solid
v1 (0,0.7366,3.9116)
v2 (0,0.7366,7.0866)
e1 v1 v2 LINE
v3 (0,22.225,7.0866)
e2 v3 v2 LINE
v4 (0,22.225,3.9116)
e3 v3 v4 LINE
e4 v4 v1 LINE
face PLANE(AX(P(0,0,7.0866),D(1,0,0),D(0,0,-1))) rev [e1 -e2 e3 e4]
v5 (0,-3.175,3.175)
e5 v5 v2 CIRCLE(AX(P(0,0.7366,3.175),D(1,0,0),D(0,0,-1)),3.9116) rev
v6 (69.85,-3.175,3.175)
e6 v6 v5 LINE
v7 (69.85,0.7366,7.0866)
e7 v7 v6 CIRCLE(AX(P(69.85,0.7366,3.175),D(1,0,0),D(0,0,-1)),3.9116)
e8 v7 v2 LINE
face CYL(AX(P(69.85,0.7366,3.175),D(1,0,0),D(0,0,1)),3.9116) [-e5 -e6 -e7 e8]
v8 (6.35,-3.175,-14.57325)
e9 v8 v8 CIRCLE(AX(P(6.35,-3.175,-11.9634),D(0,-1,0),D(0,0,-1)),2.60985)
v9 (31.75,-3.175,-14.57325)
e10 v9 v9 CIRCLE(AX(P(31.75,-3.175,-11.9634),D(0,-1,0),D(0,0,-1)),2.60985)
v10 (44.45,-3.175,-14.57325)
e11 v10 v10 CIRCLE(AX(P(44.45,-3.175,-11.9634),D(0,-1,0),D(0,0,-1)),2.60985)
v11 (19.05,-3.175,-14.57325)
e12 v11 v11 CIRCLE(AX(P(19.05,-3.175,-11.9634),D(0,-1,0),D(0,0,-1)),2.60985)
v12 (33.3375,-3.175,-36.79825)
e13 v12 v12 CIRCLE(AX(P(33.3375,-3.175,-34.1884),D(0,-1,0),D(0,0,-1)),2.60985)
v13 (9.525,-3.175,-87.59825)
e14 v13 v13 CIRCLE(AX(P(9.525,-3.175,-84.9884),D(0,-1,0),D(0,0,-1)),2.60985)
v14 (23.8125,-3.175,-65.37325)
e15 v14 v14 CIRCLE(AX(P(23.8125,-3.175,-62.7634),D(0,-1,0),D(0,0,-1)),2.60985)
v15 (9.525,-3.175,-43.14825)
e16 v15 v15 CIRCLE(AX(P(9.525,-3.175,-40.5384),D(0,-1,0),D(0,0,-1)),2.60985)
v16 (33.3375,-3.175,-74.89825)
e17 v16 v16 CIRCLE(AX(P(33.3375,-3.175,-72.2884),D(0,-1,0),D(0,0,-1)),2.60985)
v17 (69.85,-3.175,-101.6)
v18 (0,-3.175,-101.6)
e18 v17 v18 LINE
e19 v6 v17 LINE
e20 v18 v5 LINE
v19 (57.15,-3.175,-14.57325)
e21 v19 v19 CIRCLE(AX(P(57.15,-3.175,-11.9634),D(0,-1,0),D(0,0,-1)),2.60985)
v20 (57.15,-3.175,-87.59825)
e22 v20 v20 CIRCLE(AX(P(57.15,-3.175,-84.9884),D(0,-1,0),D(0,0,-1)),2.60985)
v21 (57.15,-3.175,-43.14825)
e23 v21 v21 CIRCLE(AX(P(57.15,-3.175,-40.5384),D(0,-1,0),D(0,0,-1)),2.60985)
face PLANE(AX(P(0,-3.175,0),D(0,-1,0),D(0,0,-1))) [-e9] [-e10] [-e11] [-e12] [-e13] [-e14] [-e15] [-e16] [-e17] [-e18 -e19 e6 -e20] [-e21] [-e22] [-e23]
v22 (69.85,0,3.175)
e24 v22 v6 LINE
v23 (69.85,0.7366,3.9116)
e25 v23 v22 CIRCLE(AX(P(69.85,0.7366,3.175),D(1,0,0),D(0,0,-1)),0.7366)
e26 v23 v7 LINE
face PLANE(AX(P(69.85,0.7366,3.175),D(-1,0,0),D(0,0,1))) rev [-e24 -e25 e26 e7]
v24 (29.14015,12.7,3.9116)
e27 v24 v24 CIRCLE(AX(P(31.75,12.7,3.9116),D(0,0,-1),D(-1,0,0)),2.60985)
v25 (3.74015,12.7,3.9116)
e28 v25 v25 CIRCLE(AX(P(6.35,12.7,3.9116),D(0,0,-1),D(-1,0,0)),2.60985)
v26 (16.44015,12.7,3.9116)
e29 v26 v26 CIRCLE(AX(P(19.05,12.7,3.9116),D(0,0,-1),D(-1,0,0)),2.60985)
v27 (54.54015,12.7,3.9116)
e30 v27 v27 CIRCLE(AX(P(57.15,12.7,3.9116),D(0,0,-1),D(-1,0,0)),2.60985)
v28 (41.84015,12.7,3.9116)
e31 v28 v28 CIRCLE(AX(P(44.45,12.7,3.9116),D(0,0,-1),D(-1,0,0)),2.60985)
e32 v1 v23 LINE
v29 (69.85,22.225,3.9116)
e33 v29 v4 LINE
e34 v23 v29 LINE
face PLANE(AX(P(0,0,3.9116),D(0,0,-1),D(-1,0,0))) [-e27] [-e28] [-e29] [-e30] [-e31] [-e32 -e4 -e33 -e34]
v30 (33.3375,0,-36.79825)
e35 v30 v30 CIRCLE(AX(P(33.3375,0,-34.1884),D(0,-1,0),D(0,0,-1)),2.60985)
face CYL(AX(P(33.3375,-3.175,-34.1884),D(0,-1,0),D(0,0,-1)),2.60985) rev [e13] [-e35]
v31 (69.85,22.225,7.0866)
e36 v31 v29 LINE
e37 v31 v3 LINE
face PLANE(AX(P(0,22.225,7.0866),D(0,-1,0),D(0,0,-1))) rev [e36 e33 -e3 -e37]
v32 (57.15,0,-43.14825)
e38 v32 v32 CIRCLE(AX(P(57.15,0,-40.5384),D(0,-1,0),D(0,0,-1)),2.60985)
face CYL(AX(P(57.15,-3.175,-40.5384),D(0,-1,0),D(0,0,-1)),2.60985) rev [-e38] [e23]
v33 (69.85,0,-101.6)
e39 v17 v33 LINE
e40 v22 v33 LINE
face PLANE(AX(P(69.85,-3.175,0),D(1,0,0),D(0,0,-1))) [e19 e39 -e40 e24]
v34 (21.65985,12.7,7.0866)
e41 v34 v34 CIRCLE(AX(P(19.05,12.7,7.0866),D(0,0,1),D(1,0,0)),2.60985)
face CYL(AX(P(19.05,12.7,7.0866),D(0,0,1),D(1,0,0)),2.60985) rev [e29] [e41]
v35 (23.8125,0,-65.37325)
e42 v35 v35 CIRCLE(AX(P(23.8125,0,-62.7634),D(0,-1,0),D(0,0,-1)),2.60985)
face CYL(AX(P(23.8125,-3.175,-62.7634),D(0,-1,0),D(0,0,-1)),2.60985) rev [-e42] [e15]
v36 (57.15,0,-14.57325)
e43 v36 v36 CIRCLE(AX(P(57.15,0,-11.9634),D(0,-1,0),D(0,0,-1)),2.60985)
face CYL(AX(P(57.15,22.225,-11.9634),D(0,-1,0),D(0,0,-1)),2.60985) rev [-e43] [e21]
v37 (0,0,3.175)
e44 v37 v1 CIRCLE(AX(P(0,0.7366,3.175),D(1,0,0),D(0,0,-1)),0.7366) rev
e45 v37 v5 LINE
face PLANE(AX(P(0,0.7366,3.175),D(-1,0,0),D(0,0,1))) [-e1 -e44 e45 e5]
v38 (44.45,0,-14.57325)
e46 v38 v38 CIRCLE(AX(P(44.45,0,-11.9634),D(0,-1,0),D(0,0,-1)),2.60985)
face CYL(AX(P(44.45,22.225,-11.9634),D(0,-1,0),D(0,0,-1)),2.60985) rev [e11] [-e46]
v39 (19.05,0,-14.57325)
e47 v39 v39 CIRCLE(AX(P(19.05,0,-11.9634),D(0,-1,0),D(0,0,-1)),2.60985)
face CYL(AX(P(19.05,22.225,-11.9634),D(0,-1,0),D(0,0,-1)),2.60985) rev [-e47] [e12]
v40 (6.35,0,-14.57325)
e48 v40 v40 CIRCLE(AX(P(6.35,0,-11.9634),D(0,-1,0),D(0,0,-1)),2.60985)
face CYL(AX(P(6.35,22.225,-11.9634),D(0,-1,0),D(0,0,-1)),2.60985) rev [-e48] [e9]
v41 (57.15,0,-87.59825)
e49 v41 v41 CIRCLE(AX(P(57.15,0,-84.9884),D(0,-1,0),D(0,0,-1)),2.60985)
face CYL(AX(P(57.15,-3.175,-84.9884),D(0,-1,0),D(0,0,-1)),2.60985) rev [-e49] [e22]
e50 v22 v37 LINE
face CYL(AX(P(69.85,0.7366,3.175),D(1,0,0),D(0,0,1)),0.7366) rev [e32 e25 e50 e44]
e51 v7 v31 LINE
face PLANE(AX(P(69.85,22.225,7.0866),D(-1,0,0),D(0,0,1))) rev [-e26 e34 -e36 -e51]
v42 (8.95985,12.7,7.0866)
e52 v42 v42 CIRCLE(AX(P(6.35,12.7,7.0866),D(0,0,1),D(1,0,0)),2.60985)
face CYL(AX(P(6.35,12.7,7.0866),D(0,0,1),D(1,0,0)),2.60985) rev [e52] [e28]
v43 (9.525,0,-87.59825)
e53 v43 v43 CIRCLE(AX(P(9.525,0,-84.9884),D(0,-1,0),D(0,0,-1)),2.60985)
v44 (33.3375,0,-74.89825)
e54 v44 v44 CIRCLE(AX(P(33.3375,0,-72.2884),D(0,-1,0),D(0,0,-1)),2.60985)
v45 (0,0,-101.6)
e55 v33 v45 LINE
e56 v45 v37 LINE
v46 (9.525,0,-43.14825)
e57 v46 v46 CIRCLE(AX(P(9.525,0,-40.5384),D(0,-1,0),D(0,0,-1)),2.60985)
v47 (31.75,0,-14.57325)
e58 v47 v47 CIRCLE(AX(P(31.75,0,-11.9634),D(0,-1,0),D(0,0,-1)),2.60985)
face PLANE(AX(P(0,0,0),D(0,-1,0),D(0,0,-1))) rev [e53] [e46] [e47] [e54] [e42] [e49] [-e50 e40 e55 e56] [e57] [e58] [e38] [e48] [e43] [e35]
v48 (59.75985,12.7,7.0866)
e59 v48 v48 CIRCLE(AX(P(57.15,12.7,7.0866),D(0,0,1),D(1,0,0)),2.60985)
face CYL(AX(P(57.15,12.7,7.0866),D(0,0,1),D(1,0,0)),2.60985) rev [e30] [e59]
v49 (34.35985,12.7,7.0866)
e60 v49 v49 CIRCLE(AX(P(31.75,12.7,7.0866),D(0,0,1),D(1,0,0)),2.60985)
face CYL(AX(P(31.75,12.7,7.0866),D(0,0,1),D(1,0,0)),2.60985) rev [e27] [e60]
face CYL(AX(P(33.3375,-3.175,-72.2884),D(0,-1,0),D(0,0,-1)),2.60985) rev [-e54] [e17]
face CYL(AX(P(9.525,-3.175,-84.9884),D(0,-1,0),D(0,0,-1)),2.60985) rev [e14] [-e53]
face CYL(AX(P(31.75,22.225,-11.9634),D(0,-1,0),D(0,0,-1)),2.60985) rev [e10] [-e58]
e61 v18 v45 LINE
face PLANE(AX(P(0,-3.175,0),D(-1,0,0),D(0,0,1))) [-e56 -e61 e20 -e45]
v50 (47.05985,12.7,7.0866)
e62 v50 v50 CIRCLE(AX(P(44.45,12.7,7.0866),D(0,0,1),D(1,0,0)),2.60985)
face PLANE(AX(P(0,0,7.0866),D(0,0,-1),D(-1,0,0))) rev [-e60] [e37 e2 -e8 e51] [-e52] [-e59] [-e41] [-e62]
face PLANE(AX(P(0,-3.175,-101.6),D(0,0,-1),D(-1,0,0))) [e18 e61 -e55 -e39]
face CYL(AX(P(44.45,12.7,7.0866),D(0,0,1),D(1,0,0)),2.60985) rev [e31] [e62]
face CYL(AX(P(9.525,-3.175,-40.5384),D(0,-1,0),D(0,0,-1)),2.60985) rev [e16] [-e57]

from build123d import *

# Parameters (mm, degrees)
SKETCH1_W                   = 69.85
SKETCH1_H                   = 101.6
BASE_FLANGE1_DEPTH          = 3.175
EDGE_FLANGE1_DEPTH          = 69.85
F_5_0_2055_DIAMETER_HOLE1_D = 5.2197
F_5_0_2055_DIAMETER_HOLE3_D = 5.2197
SKETCH21_R                  = 2.60985
CUT_EXTRUDE1_DEPTH          = 126.88384527


# Sheet-metal steps are written as plain solids
with BuildPart() as part:
    # Sketch1 → Base-Flange1 (new body)
    with BuildSketch(Plane(origin=(0, 0, 0), x_dir=(1, 0, 0), z_dir=(0, 1, 0))):
        with Locations((34.925, 50.8)):
            Rectangle(SKETCH1_W, SKETCH1_H)
    extrude(amount=-BASE_FLANGE1_DEPTH)

    # Edge-Flange1 section (across the edge) → Edge-Flange1 (add)
    with BuildSketch(Plane(origin=(0, 0, 3.9116), x_dir=(0, 0, -1), z_dir=(1, 0, 0))):
        with BuildLine():
            Line((-3.175, 0.7366), (-3.175, 22.225))
            Line((-3.175, 22.225), (0, 22.225))
            Line((0, 22.225), (0, 0.7366))
            ThreePointArc((0, 0.7366), (0.215745145, 0.215745145), (0.7366, 0))
            Line((0.7366, 0), (3.9116, 0))
            Line((3.9116, 0), (3.9116, -3.175))
            Line((3.9116, -3.175), (0.7366, -3.175))
            ThreePointArc((0.7366, -3.175), (-2.029318885, -2.029318885), (-3.175, 0.7366))
        make_face()
    extrude(amount=EDGE_FLANGE1_DEPTH)

    # #5 (0.2055) Diameter Hole1 (through all)
    with Locations(Plane.XZ.offset(3.175)):
        with Locations((33.3375, -34.1884), (23.8125, -62.7634), (33.3375, -72.2884), (57.15, -84.9884), (57.15, -40.5384), (9.525, -40.5384), (9.525, -84.9884)):
            Hole(F_5_0_2055_DIAMETER_HOLE1_D / 2)

    # #5 (0.2055) Diameter Hole3 (through all)
    with Locations(Plane.XY.offset(7.0866)):
        with Locations((6.35, 12.7), (19.05, 12.7), (31.75, 12.7), (44.45, 12.7), (57.15, 12.7)):
            Hole(F_5_0_2055_DIAMETER_HOLE3_D / 2)

    # Sketch21 → Cut-Extrude1 (cut, through all)
    with BuildSketch(Plane.XZ.offset(3.175)):
        with Locations(Location((19.050000049, -11.9634, 0), (0, 0, 270))):
            Circle(SKETCH21_R)
        with Locations(Location((6.350000049, -11.9634, 0), (0, 0, 270))):
            Circle(SKETCH21_R)
        with Locations(Location((31.750000049, -11.9634, 0), (0, 0, 270))):
            Circle(SKETCH21_R)
        with Locations(Location((44.450000049, -11.9634, 0), (0, 0, 270))):
            Circle(SKETCH21_R)
        with Locations(Location((57.150000049, -11.9634, 0), (0, 0, 270))):
            Circle(SKETCH21_R)
    extrude(amount=-CUT_EXTRUDE1_DEPTH, mode=Mode.SUBTRACT)


solid = part.part
